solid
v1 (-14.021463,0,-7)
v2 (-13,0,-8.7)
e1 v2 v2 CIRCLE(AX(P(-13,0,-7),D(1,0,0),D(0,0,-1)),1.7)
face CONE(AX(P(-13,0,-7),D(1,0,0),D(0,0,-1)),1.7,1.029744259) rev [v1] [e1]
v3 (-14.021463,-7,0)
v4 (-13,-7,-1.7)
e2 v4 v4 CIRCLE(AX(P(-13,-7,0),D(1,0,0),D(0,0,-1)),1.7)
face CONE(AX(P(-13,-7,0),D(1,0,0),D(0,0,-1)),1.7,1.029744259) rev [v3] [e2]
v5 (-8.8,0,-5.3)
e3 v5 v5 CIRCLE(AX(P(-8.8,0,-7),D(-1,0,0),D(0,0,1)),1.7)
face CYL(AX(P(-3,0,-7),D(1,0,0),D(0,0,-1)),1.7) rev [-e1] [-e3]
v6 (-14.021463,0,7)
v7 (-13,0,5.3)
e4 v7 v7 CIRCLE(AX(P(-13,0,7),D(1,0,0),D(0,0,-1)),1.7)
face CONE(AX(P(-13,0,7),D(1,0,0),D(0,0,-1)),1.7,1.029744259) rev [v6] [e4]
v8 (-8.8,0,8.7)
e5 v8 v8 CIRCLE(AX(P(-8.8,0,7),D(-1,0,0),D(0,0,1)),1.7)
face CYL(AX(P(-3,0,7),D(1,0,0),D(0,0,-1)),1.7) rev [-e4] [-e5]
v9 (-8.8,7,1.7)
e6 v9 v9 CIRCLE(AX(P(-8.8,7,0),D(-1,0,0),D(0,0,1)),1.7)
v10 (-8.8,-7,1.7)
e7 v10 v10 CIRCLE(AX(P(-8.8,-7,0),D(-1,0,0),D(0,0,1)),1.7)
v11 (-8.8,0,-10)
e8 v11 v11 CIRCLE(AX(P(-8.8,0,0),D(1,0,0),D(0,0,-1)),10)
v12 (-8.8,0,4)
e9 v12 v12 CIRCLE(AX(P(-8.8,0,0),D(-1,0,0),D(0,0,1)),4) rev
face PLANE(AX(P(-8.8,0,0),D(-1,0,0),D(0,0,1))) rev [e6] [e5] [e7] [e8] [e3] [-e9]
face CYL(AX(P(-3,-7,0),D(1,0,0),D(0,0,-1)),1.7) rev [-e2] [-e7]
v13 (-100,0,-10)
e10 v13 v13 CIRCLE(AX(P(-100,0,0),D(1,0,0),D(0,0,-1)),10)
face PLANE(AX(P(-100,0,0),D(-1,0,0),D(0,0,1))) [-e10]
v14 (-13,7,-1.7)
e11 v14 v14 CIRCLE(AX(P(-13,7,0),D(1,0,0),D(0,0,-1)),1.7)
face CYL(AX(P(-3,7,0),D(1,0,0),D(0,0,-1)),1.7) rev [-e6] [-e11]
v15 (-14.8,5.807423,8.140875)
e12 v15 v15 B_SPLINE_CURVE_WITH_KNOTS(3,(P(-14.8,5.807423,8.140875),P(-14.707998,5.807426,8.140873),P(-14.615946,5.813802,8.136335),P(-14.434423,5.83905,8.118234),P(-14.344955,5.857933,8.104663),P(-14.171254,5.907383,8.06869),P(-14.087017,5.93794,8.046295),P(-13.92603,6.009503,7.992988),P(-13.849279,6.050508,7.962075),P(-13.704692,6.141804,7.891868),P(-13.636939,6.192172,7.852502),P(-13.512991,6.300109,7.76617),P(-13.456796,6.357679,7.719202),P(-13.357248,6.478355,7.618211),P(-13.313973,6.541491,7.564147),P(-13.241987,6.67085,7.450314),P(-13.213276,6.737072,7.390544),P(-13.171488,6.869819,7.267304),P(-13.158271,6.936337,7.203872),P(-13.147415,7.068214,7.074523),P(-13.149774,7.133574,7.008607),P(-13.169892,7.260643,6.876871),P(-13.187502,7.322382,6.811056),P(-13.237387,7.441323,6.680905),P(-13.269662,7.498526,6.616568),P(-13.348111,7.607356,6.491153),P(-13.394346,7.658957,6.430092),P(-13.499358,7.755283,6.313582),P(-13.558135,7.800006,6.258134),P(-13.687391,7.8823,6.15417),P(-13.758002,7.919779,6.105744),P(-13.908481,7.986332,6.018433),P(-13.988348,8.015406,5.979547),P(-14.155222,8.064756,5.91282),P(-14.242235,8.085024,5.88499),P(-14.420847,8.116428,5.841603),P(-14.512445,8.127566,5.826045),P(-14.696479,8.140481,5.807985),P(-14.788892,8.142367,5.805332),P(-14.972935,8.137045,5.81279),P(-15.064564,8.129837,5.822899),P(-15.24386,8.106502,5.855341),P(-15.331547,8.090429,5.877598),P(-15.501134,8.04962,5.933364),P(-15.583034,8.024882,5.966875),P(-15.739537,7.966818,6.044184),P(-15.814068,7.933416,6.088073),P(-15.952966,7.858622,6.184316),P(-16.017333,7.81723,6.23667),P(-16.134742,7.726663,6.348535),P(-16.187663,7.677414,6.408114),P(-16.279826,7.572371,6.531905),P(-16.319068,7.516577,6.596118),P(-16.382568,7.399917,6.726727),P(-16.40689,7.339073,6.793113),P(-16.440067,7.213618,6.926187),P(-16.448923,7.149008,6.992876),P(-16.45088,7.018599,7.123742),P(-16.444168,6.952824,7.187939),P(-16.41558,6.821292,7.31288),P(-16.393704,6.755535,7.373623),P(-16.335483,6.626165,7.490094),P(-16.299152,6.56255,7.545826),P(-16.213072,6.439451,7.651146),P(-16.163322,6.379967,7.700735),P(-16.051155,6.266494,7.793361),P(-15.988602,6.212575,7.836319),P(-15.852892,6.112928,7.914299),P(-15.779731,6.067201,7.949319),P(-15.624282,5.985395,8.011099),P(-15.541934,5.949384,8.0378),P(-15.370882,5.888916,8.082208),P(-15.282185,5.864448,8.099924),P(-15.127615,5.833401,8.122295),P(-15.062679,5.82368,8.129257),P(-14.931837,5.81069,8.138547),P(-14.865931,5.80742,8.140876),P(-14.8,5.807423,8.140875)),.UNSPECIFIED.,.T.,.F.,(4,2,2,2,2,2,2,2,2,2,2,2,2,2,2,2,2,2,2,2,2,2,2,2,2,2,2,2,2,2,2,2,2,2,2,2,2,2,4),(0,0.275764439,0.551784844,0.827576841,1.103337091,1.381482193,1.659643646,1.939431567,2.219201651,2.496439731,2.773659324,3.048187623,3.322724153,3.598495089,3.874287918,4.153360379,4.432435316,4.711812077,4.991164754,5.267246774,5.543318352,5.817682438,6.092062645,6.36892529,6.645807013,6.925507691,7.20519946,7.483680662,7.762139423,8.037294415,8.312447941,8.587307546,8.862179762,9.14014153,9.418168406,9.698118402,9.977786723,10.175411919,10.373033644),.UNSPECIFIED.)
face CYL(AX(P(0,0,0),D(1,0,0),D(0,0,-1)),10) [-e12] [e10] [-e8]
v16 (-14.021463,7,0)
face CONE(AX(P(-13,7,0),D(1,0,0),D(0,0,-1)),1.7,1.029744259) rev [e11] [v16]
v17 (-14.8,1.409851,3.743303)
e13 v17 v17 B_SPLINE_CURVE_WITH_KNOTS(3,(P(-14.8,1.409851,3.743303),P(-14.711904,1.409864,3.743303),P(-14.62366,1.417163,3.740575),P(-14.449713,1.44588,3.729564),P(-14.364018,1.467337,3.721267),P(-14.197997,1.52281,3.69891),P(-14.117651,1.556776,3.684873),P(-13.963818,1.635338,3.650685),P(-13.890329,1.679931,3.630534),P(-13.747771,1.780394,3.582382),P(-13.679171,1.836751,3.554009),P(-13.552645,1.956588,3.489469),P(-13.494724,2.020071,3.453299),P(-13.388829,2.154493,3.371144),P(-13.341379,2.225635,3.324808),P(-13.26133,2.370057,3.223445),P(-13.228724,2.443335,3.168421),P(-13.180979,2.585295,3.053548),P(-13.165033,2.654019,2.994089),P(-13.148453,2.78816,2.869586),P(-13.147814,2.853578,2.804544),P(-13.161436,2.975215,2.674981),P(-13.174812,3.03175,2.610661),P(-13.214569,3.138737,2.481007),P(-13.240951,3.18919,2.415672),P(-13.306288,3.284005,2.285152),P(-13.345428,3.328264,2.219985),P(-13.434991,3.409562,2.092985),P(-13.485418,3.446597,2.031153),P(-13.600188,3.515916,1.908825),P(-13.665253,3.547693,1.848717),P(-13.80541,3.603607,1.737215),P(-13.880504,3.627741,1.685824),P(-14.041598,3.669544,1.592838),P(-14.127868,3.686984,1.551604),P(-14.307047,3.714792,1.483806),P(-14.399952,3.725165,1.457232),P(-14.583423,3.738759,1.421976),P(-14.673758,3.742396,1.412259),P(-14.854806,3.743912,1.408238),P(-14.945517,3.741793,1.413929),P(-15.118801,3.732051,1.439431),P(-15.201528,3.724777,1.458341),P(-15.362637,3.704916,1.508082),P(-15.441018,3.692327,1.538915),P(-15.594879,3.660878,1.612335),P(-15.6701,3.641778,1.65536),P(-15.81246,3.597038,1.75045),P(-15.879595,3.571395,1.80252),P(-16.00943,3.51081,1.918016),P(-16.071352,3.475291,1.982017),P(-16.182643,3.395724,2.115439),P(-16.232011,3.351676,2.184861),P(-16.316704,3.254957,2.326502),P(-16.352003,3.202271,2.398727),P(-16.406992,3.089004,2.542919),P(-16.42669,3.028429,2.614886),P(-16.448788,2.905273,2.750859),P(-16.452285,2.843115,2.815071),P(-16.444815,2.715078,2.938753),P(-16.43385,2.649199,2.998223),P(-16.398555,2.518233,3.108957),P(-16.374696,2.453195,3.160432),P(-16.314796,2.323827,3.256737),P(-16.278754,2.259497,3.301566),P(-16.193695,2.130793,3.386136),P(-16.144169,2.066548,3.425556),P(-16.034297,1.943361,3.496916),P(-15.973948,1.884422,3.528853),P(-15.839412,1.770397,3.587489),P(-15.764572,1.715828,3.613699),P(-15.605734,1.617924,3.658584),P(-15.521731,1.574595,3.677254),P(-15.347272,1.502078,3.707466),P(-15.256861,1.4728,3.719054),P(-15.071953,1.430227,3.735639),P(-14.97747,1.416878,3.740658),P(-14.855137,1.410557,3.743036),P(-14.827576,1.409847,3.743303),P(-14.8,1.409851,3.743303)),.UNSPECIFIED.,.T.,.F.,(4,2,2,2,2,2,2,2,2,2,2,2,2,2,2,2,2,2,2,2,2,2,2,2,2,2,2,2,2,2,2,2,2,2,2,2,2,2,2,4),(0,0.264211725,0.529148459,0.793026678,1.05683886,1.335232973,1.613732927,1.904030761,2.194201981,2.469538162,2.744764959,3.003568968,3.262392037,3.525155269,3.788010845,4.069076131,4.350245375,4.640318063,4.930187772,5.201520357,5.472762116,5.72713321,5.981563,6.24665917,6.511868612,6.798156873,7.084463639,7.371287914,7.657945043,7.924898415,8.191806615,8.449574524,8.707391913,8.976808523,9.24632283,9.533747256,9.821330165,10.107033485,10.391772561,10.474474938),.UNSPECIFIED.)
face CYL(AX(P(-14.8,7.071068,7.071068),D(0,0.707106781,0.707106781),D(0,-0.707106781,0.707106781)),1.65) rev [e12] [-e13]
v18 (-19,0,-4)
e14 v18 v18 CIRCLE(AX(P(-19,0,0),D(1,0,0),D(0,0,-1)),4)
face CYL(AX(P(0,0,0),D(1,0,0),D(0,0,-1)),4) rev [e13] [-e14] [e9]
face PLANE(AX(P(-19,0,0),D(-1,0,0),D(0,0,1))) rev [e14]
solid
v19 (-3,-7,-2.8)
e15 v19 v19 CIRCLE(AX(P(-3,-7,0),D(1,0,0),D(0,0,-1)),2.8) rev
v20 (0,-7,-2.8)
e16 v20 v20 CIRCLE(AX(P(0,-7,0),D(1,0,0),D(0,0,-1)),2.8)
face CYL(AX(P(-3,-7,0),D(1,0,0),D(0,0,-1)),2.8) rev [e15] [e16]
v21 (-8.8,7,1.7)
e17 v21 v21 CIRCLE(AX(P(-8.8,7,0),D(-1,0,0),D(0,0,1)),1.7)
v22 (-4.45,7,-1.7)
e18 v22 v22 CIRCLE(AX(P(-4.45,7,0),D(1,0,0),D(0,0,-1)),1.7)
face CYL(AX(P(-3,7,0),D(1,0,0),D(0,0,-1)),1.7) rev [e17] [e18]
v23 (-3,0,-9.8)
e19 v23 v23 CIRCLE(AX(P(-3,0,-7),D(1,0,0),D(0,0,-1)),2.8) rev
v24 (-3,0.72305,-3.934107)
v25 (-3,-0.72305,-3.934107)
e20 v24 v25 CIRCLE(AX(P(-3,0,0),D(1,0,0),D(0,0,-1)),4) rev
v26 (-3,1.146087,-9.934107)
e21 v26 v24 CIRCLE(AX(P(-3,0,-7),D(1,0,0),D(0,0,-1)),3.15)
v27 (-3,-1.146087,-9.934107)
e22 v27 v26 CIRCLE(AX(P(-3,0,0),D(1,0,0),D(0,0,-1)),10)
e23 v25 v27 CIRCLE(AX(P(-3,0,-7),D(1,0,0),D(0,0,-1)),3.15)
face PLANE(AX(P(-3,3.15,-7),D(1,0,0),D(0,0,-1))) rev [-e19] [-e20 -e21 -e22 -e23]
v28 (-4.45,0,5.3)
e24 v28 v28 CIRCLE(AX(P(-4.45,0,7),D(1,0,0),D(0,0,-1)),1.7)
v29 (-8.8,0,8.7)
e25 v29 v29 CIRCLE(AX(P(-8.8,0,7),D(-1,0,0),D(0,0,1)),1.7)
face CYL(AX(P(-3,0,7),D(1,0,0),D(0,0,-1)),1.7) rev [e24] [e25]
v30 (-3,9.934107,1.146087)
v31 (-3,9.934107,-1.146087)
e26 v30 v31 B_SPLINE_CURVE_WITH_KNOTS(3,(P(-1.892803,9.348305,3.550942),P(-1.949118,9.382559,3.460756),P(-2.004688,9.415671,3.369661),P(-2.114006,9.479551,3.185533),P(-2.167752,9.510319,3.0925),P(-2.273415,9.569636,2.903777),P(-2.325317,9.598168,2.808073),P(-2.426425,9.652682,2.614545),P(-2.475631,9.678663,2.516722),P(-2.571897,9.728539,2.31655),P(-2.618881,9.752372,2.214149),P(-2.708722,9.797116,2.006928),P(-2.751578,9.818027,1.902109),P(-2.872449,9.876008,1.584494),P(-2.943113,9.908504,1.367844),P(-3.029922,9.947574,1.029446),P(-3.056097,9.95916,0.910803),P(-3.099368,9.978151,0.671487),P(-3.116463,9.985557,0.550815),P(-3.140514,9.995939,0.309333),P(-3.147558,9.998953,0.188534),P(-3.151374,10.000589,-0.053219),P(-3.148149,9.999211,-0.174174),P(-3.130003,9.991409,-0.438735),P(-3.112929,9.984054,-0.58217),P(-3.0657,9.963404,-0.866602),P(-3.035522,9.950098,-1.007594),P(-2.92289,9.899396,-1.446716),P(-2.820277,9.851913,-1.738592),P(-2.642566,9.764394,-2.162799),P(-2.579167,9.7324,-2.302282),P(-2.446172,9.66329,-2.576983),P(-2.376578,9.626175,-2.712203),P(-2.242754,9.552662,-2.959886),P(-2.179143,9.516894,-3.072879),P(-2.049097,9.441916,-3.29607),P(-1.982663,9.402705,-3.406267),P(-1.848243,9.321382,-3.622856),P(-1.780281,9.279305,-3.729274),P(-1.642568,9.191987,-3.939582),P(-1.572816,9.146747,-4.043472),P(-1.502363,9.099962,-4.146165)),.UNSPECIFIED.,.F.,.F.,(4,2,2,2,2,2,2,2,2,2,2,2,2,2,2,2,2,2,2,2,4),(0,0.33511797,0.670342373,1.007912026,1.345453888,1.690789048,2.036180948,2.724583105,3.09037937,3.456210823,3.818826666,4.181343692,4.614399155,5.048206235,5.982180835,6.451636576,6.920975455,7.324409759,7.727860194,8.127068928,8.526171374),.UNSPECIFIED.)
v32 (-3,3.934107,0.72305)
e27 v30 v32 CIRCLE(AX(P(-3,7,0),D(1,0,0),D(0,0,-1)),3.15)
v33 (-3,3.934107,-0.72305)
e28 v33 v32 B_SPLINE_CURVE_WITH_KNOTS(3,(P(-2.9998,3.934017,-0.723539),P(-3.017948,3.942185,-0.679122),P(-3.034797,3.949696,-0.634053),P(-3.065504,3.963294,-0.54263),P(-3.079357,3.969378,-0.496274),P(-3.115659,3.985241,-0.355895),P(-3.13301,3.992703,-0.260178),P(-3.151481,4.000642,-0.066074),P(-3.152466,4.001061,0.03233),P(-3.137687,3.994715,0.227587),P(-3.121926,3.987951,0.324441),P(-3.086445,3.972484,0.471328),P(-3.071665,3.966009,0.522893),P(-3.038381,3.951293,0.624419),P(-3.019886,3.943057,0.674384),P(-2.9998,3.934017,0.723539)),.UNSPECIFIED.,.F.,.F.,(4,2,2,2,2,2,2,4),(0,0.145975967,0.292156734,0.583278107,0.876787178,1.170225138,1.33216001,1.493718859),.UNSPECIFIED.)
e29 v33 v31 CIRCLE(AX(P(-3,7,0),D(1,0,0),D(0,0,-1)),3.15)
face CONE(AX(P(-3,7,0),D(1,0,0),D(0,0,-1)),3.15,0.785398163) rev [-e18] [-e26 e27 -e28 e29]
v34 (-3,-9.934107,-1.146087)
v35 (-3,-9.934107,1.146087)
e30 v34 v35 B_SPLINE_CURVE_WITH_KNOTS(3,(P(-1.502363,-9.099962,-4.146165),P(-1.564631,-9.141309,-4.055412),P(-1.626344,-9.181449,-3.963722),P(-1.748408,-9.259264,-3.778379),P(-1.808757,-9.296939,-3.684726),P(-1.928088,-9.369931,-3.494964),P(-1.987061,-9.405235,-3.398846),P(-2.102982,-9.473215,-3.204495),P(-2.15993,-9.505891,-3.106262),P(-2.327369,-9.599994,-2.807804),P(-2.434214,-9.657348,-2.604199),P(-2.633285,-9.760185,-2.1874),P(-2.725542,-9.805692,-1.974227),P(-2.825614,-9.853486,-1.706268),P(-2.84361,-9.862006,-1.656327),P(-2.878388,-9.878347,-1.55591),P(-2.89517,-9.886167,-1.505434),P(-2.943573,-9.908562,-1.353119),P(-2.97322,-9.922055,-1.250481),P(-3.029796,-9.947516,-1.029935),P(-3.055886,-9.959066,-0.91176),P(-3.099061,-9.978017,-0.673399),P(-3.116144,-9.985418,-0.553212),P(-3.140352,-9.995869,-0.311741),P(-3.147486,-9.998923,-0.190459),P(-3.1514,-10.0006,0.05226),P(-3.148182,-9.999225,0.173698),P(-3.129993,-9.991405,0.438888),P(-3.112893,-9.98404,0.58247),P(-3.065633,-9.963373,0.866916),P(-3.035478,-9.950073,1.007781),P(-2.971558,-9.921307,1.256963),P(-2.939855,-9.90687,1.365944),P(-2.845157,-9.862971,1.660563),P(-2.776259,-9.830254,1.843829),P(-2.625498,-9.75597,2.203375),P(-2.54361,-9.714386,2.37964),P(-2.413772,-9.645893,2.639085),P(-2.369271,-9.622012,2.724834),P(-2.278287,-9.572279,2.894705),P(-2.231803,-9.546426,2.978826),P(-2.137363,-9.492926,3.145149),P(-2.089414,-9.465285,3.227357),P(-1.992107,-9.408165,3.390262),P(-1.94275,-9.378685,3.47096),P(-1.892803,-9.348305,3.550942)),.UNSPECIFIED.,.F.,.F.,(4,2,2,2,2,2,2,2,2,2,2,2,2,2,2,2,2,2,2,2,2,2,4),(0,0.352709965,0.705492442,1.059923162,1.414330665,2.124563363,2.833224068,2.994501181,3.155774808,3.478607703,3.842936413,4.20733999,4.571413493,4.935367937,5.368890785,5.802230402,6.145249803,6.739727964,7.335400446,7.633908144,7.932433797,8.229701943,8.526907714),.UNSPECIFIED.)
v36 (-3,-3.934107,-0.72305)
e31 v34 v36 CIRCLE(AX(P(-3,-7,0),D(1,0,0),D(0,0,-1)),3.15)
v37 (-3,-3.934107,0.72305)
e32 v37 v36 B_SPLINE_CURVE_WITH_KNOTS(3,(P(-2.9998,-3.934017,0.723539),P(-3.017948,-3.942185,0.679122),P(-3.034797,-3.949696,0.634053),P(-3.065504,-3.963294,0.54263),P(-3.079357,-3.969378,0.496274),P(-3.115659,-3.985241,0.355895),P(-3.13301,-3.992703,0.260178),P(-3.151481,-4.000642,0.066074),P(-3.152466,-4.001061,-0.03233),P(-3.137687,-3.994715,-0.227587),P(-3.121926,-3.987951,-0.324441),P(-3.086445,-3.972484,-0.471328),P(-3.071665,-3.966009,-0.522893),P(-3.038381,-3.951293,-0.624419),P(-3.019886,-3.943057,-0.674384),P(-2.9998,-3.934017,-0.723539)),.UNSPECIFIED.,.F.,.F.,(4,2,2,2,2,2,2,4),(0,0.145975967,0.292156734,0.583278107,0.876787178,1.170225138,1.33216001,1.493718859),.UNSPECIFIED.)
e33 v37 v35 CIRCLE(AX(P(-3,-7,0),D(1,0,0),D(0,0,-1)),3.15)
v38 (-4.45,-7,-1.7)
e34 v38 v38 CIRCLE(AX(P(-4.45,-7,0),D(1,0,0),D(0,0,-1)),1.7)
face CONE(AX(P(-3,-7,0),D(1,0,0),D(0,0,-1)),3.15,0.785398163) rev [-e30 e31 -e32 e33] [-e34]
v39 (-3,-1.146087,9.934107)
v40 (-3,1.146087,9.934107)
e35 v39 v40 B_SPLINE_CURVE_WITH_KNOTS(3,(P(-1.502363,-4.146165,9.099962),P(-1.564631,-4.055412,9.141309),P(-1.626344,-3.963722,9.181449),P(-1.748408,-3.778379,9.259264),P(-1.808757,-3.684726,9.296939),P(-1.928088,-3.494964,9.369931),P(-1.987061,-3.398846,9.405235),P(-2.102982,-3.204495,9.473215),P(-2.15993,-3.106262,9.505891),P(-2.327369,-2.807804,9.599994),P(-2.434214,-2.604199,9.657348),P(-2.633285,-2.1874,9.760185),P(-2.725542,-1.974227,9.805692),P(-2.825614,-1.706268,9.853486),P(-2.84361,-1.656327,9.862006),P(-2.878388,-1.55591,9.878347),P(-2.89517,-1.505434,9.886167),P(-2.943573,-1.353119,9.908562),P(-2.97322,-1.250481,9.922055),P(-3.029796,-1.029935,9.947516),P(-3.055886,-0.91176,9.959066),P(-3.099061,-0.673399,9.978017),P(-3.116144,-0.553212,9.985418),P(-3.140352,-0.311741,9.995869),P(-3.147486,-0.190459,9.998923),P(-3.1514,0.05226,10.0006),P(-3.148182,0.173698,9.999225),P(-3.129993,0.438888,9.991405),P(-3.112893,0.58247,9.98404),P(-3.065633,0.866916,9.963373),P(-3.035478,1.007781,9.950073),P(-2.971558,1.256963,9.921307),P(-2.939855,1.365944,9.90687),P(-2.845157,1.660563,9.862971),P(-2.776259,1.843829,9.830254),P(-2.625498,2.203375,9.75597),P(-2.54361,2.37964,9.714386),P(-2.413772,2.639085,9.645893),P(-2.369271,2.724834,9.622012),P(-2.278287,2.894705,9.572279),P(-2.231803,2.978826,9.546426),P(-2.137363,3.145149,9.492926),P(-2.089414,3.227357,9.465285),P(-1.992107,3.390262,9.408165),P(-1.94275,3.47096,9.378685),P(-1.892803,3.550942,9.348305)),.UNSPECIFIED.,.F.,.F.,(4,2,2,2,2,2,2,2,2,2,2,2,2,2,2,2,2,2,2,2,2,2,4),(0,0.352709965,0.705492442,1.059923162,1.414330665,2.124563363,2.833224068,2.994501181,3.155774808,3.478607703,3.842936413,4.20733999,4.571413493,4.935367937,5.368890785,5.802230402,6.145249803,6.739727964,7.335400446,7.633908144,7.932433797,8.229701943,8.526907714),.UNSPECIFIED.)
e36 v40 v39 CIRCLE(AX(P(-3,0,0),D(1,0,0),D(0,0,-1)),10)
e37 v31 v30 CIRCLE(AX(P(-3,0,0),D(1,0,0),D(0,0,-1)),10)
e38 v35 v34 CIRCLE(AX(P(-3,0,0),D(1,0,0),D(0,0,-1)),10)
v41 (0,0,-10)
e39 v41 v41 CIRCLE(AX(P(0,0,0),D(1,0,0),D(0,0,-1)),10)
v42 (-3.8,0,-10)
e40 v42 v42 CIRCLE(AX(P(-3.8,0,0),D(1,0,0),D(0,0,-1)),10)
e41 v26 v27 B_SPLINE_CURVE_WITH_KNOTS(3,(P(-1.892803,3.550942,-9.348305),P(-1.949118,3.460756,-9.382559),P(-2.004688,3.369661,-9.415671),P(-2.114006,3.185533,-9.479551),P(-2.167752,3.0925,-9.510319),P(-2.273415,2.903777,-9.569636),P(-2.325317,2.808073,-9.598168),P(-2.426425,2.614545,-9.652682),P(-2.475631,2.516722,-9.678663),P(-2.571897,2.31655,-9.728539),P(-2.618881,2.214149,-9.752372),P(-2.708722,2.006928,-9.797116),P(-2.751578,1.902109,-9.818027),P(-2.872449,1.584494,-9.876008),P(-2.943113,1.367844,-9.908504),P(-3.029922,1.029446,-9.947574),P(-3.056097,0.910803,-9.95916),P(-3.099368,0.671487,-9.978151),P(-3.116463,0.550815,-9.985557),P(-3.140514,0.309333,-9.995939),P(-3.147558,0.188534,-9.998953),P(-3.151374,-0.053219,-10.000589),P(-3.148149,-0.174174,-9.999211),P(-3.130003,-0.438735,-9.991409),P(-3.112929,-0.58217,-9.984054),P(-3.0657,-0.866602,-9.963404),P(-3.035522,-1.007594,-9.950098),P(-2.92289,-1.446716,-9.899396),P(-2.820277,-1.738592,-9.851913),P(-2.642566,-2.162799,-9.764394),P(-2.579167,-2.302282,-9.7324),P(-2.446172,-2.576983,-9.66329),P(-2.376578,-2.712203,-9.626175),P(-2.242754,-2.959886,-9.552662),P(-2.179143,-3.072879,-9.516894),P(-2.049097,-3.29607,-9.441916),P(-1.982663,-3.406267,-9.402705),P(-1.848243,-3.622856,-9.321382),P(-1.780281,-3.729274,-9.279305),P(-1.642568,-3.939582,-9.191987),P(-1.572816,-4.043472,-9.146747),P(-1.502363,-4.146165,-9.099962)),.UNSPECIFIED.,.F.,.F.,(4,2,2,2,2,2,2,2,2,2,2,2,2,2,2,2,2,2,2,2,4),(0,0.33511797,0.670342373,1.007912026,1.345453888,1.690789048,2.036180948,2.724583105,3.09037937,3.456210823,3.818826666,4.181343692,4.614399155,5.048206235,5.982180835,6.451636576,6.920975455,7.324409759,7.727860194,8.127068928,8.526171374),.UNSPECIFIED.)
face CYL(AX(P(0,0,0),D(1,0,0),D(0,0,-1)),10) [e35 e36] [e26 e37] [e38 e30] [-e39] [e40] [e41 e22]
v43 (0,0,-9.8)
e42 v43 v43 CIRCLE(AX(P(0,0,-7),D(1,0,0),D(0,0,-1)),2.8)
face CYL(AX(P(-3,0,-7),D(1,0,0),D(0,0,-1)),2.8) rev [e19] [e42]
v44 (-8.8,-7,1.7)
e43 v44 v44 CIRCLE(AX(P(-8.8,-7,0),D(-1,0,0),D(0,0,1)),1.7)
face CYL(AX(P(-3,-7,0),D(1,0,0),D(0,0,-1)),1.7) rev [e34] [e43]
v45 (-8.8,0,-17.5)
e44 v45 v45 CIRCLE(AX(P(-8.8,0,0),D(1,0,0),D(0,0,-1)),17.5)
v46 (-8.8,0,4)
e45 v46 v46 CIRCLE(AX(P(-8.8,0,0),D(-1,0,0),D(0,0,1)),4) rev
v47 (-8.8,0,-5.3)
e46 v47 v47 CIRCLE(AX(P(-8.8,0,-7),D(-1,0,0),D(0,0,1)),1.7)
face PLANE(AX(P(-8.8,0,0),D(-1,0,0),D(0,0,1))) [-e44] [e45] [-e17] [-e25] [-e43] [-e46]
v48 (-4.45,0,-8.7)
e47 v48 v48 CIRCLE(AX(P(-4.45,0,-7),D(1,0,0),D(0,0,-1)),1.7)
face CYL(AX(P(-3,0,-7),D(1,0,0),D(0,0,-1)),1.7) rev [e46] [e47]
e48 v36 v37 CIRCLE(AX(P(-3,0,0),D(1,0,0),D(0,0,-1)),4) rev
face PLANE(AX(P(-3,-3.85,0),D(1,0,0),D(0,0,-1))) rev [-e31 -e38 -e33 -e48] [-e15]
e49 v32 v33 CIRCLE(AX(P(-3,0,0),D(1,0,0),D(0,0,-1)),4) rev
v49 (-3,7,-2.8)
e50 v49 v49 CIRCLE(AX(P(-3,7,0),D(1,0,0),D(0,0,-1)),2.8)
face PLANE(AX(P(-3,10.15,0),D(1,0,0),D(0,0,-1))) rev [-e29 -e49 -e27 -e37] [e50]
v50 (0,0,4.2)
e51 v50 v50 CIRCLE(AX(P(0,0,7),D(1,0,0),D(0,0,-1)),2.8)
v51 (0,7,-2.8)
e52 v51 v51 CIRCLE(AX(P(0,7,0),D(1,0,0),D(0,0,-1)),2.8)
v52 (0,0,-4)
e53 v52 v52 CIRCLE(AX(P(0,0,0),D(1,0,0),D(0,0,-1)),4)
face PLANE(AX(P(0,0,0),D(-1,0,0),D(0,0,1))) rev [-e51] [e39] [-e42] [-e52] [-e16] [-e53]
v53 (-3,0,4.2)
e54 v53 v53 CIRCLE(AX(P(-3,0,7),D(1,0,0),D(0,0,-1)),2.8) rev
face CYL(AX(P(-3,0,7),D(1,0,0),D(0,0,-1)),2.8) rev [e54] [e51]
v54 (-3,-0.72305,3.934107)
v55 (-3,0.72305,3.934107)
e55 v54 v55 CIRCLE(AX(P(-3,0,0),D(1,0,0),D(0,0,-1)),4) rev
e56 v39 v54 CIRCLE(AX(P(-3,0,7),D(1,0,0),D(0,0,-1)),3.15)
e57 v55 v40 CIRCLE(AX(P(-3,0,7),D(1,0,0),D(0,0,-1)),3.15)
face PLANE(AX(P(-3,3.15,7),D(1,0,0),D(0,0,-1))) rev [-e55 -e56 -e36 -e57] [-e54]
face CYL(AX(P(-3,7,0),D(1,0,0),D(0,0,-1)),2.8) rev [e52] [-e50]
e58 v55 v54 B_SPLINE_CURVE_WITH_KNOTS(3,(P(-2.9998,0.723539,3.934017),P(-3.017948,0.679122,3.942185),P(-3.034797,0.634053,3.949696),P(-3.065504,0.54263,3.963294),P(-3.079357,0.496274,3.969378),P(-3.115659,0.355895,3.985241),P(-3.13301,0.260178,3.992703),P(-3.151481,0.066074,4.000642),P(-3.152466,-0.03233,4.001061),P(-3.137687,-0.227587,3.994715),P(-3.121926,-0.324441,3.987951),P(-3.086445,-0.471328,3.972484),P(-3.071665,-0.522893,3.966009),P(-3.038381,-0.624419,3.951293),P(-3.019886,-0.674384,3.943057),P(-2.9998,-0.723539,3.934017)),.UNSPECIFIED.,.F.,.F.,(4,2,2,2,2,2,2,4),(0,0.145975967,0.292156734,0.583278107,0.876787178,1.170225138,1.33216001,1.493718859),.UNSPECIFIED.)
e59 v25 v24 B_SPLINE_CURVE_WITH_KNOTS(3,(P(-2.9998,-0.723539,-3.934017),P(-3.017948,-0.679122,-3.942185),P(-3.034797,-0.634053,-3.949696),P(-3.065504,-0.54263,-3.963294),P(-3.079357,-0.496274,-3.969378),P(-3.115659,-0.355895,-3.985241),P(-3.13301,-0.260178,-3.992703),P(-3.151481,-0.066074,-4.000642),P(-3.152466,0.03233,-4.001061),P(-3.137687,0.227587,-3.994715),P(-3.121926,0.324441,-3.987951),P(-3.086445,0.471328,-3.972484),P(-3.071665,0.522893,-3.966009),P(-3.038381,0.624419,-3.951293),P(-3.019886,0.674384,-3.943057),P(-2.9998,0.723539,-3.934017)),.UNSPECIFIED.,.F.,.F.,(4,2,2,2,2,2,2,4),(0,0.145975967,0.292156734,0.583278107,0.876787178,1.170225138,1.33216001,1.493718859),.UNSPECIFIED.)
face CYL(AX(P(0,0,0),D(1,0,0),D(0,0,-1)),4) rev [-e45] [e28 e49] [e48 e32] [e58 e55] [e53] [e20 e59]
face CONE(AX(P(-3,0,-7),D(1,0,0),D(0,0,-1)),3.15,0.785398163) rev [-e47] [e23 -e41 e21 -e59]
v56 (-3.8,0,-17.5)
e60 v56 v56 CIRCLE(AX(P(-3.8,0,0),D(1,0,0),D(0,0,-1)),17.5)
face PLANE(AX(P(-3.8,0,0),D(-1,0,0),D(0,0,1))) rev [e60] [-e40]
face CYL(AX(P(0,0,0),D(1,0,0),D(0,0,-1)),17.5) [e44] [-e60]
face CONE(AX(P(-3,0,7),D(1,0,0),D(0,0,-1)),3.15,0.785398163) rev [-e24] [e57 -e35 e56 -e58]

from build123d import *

# Parameters (mm, degrees)
SKETCH13_R                                   = 2.8
CUT_EXTRUDE1_DEPTH                           = 3
CSK_FOR_M3_COUNTERSUNK_RAISED_HEAD_S_2_COUNT = 2
CSK_FOR_M3_COUNTERSUNK_RAISED_HEAD_S_2_PITCH = 9.899494937
CSK_FOR_M3_COUNTERSUNK_RAISED_HEAD_S_3_COUNT = 2
CSK_FOR_M3_COUNTERSUNK_RAISED_HEAD_S_3_PITCH = 14
CSK_FOR_M3_COUNTERSUNK_RAISED_HEAD_S_4_COUNT = 2
CSK_FOR_M3_COUNTERSUNK_RAISED_HEAD_S_4_PITCH = 9.899494937
M4_START                                     = 3.643830283
M4_TAPPED_HOLE2_OUTLINE_R                    = 1.65
M4_TAPPED_HOLE2_DEPTH                        = 6.356169708
SKETCH14_R                                   = 17.5
SKETCH14_R_2                                 = 2.8
SKETCH14_R_3                                 = 4
BOSS_EXTRUDE1_DEPTH                          = 3


# Read off the part's stored shape, not the designer's step: M4 Tapped Hole2
with BuildPart() as part:
    # Sketch1 → Revolve2 (revolve)
    with BuildSketch(Plane(origin=(0, 0, 0), x_dir=(1, 0, 0), z_dir=(0, 1, 0))):
        Polygon((-3.8, 10), (-3.8, 17.5), (-8.8, 17.5), (-8.8, 10), (-100, 10), (-100, 0), (-19, 0), (-19, 4), (0, 4), (0, 10), align=None)
    revolve(axis=Axis((0, 0, 0), (-1, 0, 0)))


with BuildPart() as body_2:
    # Split1: the piece on the far side of the plane
    add(part.part)
    split(bisect_by=Plane(origin=(-8.8, 0, 0), x_dir=(0, 0, -1), z_dir=(-1, 0, 0)), keep=Keep.BOTTOM)

    # Sketch13 → Cut-Extrude1 (cut)
    with BuildSketch(Plane(origin=(0, 0, 0), x_dir=(0, 0, -1), z_dir=(1, 0, 0))):
        with Locations((0, 7)):
            Circle(SKETCH13_R)
        with Locations((7, 0)):
            Circle(SKETCH13_R)
        with Locations((0, -7)):
            Circle(SKETCH13_R)
        with Locations((-7, 0)):
            Circle(SKETCH13_R)
    extrude(amount=-CUT_EXTRUDE1_DEPTH, mode=Mode.SUBTRACT)


with BuildPart() as part_1:
    add(part.part)

    # Split1
    split(bisect_by=Plane(origin=(-8.8, 0, 0), x_dir=(0, 0, -1), z_dir=(-1, 0, 0)), keep=Keep.TOP)


with BuildPart() as csk_for_m3_countersunk_raised_head_screw_tool:
    # Sketch7 → CSK for M3 Countersunk Raised Head Screw2 (revolve)
    with BuildSketch(Plane(origin=(-3, 0, 7), x_dir=(0, 0, -1), z_dir=(0, 1, 0))):
        Polygon((0, 0), (0, 11.021463052), (1.7, 10), (1.7, 1.45), (3.15, 0), align=None)
    csk_for_m3_countersunk_raised_head_screw = revolve(axis=Axis((3.35, 0, 7), (-1, 0, 0)))


with BuildPart() as part_2:
    add(part_1.part)

    # CSK for M3 Countersunk Raised Head Screw2: cut by csk_for_m3_countersunk_raised_head_screw_tool
    add(csk_for_m3_countersunk_raised_head_screw_tool.part, mode=Mode.SUBTRACT)


with BuildPart() as body_2_1:
    add(body_2.part)

    # CSK for M3 Countersunk Raised Head Screw2: cut by csk_for_m3_countersunk_raised_head_screw_tool
    add(csk_for_m3_countersunk_raised_head_screw_tool.part, mode=Mode.SUBTRACT)


with BuildPart() as csk_for_m3_countersunk_raised_head_s_2_tool:
    # CSK for M3 Countersunk Raised Head S 2: CSK for M3 Countersunk Raised Head Screw2 ×2
    with Locations(*[Vector(0, 0.7071067811865476, -0.7071067811865476) * (i * CSK_FOR_M3_COUNTERSUNK_RAISED_HEAD_S_2_PITCH) for i in range(1, CSK_FOR_M3_COUNTERSUNK_RAISED_HEAD_S_2_COUNT)]):
        add(csk_for_m3_countersunk_raised_head_screw)


with BuildPart() as part_3:
    add(part_2.part)

    # CSK for M3 Countersunk Raised Head S 2: cut by csk_for_m3_countersunk_raised_head_s_2_tool
    add(csk_for_m3_countersunk_raised_head_s_2_tool.part, mode=Mode.SUBTRACT)


with BuildPart() as body_2_2:
    add(body_2_1.part)

    # CSK for M3 Countersunk Raised Head S 2: cut by csk_for_m3_countersunk_raised_head_s_2_tool
    add(csk_for_m3_countersunk_raised_head_s_2_tool.part, mode=Mode.SUBTRACT)


with BuildPart() as csk_for_m3_countersunk_raised_head_s_3_tool:
    # CSK for M3 Countersunk Raised Head S 3: CSK for M3 Countersunk Raised Head Screw2 ×2
    with Locations(*[(0, 0, -i * CSK_FOR_M3_COUNTERSUNK_RAISED_HEAD_S_3_PITCH) for i in range(1, CSK_FOR_M3_COUNTERSUNK_RAISED_HEAD_S_3_COUNT)]):
        add(csk_for_m3_countersunk_raised_head_screw)


with BuildPart() as part_4:
    add(part_3.part)

    # CSK for M3 Countersunk Raised Head S 3: cut by csk_for_m3_countersunk_raised_head_s_3_tool
    add(csk_for_m3_countersunk_raised_head_s_3_tool.part, mode=Mode.SUBTRACT)


with BuildPart() as body_2_3:
    add(body_2_2.part)

    # CSK for M3 Countersunk Raised Head S 3: cut by csk_for_m3_countersunk_raised_head_s_3_tool
    add(csk_for_m3_countersunk_raised_head_s_3_tool.part, mode=Mode.SUBTRACT)


with BuildPart() as csk_for_m3_countersunk_raised_head_s_4_tool:
    # CSK for M3 Countersunk Raised Head S 4: CSK for M3 Countersunk Raised Head Screw2 ×2
    with Locations(*[Vector(0, -0.7071067811865476, -0.7071067811865476) * (i * CSK_FOR_M3_COUNTERSUNK_RAISED_HEAD_S_4_PITCH) for i in range(1, CSK_FOR_M3_COUNTERSUNK_RAISED_HEAD_S_4_COUNT)]):
        add(csk_for_m3_countersunk_raised_head_screw)


with BuildPart() as part_5:
    add(part_4.part)

    # CSK for M3 Countersunk Raised Head S 4: cut by csk_for_m3_countersunk_raised_head_s_4_tool
    add(csk_for_m3_countersunk_raised_head_s_4_tool.part, mode=Mode.SUBTRACT)

    # M4 Tapped Hole2 outline → M4 Tapped Hole2 (cut)
    with BuildSketch(Plane(origin=(0, 0, 0), x_dir=(1, 0, 0), z_dir=(0, 0.707106781186546, 0.707106781186549)).offset(M4_START)):
        with Locations((-14.8, 0)):
            Circle(M4_TAPPED_HOLE2_OUTLINE_R)
    extrude(amount=M4_TAPPED_HOLE2_DEPTH, mode=Mode.SUBTRACT)


with BuildPart() as body_2_4:
    add(body_2_3.part)

    # CSK for M3 Countersunk Raised Head S 4: cut by csk_for_m3_countersunk_raised_head_s_4_tool
    add(csk_for_m3_countersunk_raised_head_s_4_tool.part, mode=Mode.SUBTRACT)

    # Sketch14 → Boss-Extrude1 (add)
    with BuildSketch(Plane(origin=(-3.8, 0, 0), x_dir=(0, 0, -1), z_dir=(1, 0, 0))):
        Circle(SKETCH14_R)
        with Locations((0, 7)):
            Circle(SKETCH14_R_2, mode=Mode.SUBTRACT)
        with Locations((7, 0)):
            Circle(SKETCH14_R_2, mode=Mode.SUBTRACT)
        with Locations((0, -7)):
            Circle(SKETCH14_R_2, mode=Mode.SUBTRACT)
        with Locations((-7, 0)):
            Circle(SKETCH14_R_2, mode=Mode.SUBTRACT)
        Circle(SKETCH14_R_3, mode=Mode.SUBTRACT)
    extrude(amount=-BOSS_EXTRUDE1_DEPTH)


solid = Compound([part_5.part, body_2_4.part])
